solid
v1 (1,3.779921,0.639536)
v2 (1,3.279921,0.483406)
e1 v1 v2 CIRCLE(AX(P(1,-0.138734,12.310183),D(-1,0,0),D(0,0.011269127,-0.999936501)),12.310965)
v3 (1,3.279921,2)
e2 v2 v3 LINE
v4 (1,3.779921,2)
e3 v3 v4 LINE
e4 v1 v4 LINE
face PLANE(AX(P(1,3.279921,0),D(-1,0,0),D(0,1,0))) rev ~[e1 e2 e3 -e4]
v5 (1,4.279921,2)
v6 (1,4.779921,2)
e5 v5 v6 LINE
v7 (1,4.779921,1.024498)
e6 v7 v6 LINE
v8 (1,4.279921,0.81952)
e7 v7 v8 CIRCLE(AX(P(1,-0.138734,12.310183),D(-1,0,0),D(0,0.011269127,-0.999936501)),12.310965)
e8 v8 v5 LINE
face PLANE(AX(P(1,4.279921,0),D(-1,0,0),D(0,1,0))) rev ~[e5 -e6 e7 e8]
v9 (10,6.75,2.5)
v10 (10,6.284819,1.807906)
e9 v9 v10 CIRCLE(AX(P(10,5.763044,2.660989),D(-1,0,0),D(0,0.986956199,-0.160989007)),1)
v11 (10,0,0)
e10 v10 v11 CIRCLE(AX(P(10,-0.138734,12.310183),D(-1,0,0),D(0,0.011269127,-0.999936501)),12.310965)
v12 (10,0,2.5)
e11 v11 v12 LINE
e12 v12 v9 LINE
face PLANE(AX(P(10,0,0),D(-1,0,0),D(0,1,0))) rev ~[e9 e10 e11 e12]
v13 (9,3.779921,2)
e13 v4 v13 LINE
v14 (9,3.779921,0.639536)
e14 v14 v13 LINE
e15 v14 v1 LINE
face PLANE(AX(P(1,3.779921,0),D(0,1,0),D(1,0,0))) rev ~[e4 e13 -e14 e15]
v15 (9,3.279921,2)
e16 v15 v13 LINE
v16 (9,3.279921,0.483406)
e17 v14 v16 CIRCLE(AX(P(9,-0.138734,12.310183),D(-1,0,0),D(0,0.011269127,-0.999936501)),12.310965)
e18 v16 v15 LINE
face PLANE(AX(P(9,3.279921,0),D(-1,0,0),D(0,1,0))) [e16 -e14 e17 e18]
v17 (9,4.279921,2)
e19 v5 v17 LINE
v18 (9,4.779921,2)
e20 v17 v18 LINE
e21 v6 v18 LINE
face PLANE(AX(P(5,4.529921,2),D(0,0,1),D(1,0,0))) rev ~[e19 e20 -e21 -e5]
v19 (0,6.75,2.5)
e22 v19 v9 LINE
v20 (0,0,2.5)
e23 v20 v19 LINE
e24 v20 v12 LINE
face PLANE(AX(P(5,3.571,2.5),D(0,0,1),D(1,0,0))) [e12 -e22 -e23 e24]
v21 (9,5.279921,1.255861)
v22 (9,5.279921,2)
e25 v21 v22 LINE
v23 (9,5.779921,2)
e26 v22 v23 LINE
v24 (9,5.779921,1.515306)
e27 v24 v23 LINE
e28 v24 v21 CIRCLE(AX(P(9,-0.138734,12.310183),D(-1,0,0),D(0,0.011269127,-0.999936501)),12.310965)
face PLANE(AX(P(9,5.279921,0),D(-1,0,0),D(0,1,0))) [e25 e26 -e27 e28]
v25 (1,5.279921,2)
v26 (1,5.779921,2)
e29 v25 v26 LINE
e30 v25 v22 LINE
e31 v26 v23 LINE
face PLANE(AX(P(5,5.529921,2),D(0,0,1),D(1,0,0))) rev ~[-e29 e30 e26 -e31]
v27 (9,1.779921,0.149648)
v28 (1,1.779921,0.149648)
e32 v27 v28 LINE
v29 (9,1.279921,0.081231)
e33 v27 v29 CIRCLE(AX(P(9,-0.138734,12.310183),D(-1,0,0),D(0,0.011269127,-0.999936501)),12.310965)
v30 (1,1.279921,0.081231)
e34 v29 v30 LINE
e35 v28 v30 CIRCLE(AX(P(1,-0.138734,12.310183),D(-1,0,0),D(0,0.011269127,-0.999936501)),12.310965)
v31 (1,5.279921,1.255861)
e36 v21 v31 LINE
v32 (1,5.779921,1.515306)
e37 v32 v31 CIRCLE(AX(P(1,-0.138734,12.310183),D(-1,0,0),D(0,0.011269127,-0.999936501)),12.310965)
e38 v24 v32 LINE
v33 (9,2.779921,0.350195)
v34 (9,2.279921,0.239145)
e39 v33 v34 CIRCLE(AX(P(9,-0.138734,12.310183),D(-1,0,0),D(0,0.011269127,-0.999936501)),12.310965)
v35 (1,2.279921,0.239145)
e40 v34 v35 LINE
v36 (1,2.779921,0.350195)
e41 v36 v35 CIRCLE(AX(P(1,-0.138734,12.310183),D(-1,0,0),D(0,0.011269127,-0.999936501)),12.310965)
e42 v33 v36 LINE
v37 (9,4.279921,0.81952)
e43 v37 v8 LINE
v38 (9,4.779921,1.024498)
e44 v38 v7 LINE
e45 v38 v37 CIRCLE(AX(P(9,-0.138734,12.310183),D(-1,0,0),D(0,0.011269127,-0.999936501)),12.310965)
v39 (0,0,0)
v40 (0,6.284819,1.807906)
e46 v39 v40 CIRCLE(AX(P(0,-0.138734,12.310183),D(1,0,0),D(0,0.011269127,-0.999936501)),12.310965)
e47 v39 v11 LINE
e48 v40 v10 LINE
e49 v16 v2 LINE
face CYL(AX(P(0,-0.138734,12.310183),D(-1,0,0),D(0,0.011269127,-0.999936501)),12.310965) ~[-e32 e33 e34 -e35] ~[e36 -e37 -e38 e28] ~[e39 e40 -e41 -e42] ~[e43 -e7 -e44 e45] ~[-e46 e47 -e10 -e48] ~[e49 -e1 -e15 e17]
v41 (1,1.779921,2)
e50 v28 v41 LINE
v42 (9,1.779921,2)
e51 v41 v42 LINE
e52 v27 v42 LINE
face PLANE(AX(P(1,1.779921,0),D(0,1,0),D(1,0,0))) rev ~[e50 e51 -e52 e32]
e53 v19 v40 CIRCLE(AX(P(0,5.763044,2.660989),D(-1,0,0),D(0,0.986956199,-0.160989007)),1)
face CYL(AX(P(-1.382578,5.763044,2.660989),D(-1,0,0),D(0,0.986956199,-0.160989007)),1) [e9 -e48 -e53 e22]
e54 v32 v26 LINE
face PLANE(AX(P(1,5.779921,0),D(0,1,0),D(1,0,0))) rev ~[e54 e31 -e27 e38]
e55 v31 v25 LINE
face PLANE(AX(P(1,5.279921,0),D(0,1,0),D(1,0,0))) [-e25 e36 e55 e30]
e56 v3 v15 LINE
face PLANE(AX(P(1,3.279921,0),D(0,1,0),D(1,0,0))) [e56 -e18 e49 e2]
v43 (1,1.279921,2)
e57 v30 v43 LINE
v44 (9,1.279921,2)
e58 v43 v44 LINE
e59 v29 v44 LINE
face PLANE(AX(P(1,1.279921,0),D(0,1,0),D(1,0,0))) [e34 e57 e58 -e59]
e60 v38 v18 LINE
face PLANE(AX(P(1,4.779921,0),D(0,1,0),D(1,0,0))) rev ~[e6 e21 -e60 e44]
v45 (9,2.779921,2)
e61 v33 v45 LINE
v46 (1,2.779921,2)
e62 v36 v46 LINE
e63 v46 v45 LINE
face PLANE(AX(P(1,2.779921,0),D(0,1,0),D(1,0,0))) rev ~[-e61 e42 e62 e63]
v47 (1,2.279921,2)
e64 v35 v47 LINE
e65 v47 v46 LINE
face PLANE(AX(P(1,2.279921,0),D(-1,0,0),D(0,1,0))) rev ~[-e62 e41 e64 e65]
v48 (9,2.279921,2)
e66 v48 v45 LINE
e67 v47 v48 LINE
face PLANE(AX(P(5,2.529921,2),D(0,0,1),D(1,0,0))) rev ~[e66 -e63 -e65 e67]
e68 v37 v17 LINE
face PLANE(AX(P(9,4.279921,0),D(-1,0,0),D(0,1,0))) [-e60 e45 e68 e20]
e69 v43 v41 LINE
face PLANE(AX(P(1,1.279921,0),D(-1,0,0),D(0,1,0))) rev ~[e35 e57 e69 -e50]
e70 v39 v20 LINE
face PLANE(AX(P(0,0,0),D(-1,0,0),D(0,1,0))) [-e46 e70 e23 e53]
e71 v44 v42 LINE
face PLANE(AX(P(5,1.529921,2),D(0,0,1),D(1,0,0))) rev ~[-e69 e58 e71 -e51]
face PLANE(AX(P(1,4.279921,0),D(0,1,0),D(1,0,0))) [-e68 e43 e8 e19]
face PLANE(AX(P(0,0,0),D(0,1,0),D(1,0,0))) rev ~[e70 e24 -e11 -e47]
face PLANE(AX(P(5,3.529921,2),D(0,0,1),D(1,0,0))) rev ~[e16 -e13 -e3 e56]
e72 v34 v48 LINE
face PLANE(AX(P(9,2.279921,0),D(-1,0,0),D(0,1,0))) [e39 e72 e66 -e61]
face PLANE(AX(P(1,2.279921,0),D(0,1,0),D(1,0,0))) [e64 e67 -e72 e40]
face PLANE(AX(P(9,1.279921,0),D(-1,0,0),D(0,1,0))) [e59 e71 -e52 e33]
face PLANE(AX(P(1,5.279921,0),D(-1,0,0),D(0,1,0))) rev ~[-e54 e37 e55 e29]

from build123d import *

# Parameters (mm, degrees)
F0_W        = 10
F0_H        = 7.142
F1_DEPTH    = 2.5
F3_DEPTH    = 10.001
F4_T1_DEPTH = 12.7651557864
F6_W        = 8
F6_H        = 0.5
F7_DEPTH    = 2


# Not quite as in the source:
# - a fillet or chamfer that OpenCascade refuses, or shapes differently, is made with other operations: its cross-section is extruded or revolved along the edge and cut away or added


with BuildPart() as f1:
    # F0 (on Top) → F1 (new body)
    with BuildSketch(Plane.XY):
        with Locations((5, 3.571)):
            Rectangle(F0_W, F0_H)
    extrude(amount=F1_DEPTH)

    # F2 (on face) → F3 (cut, through all)
    with BuildSketch(Plane(origin=(0, 0, 0), x_dir=(0, -1, 0), z_dir=(-1, 0, 0))):
        with BuildLine():
            ThreePointArc((0, 0), (-3.5295320322, 0.5584308586), (-6.75, 2.106987431))
            Line((-6.75, 2.106987431), (-6.75, 12.27143))
            Line((-6.75, 12.27143), (-9.8289949819, -2.3460234515))
            Line((-9.8289949819, -2.3460234515), (0, 0))
        make_face()
    extrude(amount=-F3_DEPTH, mode=Mode.SUBTRACT)

    # F4: fillet of radius 1 on 1 edges, made by hand

    # F4_s2 → F4_t1 (cut)
    with BuildSketch(Plane.YZ.offset(-1.3825778932)):
        with BuildLine():
            ThreePointArc((6.75, 2.5), (6.5929931831, 2.1031503004), (6.2848187014, 1.8079058028))
            ThreePointArc((6.2848187014, 1.8079058028), (6.5190889746, 1.9548341876), (6.75, 2.106987431))
            Line((6.75, 2.106987431), (6.75, 2.5))
        make_face()
    extrude(amount=F4_T1_DEPTH, mode=Mode.SUBTRACT)

    # F6 (on offset) → F7 (cut)
    with BuildSketch(Plane.XY):
        with Locations((5, 4.5299213873)):
            Rectangle(F6_W, F6_H)
        with Locations((5, 3.5299213873)):
            Rectangle(F6_W, F6_H)
        with Locations((5, 2.5299213873)):
            Rectangle(F6_W, F6_H)
        with Locations((5, 1.5299213873)):
            Rectangle(F6_W, F6_H)
        with Locations((5, 5.5299213873)):
            Rectangle(F6_W, F6_H)
    extrude(amount=F7_DEPTH, mode=Mode.SUBTRACT)


solid = f1.part
